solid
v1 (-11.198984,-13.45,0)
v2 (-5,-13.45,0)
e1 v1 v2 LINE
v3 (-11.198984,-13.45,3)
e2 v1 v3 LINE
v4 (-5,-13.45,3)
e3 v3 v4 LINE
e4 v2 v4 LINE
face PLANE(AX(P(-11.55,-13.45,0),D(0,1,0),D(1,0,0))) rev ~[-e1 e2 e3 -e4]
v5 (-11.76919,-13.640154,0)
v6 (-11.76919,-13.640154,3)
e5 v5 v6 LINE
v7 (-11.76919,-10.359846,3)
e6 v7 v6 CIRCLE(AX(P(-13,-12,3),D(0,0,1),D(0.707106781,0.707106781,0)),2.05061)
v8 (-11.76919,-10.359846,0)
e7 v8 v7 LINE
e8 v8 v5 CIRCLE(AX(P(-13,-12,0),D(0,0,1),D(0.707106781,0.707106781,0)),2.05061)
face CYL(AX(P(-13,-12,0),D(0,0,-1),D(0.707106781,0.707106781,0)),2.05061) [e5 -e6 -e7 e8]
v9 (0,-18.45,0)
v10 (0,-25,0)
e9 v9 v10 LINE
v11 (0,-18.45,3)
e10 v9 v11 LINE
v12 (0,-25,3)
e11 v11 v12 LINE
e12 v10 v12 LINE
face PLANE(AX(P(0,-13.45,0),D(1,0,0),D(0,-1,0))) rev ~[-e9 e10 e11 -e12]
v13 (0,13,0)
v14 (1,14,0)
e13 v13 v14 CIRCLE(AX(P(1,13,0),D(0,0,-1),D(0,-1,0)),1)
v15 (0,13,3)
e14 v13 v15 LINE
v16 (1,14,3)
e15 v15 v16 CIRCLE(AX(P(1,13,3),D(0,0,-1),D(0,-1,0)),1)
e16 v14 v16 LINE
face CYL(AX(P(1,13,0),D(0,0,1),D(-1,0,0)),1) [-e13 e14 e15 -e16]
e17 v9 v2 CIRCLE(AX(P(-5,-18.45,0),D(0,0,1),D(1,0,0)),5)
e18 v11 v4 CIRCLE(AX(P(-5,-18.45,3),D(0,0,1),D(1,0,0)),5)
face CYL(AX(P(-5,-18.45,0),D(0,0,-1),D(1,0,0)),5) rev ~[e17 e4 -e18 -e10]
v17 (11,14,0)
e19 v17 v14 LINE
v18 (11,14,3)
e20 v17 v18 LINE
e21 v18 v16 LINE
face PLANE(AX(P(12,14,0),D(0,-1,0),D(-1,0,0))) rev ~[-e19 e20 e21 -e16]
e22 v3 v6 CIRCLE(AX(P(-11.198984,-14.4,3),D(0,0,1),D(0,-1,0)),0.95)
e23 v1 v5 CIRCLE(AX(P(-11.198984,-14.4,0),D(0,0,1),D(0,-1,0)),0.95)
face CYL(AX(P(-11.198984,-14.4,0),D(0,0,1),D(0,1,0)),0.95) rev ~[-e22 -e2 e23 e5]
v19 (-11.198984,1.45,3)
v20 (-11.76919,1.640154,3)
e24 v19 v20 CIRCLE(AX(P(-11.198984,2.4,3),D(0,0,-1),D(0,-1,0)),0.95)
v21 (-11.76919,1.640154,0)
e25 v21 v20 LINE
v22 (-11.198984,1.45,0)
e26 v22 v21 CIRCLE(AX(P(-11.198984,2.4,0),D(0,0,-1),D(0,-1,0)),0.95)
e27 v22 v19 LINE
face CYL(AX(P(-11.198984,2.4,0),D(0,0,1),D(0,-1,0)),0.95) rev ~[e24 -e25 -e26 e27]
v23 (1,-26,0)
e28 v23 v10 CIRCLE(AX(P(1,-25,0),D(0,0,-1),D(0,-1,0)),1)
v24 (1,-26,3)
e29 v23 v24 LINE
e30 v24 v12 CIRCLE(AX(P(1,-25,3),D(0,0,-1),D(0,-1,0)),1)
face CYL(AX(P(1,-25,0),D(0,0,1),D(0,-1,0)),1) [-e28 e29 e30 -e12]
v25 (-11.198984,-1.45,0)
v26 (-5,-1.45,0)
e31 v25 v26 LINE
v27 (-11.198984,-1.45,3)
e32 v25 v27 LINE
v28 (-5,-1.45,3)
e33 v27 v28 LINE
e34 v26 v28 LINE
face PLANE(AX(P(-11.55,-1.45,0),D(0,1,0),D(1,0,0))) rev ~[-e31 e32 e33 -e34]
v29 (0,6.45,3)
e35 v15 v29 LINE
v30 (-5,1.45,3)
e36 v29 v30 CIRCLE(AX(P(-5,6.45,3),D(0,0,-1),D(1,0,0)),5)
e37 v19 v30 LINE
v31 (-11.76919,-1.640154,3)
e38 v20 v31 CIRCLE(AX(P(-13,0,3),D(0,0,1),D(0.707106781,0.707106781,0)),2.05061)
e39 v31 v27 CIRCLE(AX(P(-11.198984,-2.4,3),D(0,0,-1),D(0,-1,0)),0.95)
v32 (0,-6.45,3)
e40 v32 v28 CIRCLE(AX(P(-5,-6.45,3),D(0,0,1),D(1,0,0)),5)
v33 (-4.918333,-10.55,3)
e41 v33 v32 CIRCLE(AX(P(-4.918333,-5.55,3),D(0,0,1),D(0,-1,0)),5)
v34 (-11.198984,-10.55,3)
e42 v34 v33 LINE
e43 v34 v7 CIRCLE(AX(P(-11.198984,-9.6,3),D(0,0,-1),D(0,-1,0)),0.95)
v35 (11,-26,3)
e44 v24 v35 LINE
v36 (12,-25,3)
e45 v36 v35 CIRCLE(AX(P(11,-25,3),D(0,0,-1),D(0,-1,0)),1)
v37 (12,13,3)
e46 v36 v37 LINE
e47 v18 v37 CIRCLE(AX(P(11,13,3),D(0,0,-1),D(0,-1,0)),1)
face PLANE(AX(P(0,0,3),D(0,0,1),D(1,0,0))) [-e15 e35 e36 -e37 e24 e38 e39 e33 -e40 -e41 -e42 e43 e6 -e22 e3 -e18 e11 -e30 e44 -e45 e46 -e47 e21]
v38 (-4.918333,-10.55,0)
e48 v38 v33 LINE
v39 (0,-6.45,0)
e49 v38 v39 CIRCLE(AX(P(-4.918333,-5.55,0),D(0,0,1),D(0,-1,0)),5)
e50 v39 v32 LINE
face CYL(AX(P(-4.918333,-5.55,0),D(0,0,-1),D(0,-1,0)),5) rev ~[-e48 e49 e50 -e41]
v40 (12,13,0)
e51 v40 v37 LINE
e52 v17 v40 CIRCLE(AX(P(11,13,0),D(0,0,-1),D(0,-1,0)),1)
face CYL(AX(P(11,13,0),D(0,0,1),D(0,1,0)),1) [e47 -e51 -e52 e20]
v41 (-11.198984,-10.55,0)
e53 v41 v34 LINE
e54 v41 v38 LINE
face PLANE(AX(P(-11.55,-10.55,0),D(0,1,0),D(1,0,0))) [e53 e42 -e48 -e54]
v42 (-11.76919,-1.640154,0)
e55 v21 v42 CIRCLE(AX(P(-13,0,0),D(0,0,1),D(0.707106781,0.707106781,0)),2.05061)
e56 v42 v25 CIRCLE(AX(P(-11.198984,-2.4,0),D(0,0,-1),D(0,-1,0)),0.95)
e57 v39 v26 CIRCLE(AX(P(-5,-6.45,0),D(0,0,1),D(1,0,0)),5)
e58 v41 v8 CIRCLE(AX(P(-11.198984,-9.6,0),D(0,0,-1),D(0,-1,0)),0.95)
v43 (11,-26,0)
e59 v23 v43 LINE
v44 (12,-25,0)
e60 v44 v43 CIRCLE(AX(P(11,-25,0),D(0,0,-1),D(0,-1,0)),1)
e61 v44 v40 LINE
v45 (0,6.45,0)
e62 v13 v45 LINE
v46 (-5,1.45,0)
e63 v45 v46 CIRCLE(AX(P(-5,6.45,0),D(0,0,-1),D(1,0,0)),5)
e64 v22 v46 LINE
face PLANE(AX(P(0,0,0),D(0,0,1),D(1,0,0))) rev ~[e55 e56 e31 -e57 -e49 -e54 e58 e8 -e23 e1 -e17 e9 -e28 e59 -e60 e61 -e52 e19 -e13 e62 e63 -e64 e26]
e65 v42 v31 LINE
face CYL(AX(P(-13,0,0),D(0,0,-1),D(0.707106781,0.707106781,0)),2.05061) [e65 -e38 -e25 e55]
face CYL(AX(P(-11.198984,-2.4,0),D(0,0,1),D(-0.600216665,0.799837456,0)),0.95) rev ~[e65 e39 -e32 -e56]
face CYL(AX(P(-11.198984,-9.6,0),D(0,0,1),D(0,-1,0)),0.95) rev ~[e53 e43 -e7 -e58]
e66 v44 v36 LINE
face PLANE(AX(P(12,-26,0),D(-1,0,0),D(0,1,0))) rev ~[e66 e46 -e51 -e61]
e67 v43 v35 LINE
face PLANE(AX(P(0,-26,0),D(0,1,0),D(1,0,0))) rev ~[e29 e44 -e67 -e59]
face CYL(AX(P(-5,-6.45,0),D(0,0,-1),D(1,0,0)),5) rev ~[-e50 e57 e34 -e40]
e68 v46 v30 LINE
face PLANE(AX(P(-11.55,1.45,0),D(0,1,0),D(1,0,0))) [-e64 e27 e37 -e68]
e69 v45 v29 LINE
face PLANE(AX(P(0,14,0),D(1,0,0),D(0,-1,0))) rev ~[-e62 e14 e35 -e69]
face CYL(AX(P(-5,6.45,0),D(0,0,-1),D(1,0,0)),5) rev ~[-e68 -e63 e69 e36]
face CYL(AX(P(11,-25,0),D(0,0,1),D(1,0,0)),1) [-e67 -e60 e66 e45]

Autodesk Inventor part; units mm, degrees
ref_plane "Plan YZ" through (0, 0, 0) normal (1, 0, 0) x (0, 1, 0)
ref_plane "Plan XZ" through (0, 0, 0) normal (0, 1, 0) x (-1, 0, 0)
ref_plane "Plan XY" through (0, 0, 0) normal (0, 0, 1) x (1, 0, 0)
sketch "Esquisse1" plane through (0, 0, 0) normal (0, 0, 1) x (1, 0, 0)
  arc A0 (-11.55, 1.45) -> (-11.55, -1.45) centre (-13, 0) ccw
  line L0 (-13, 0) -> (-11.55, -1.45) construction
  line L1 (-13, 0) -> (-10.9494, 0) construction
  line L2 (-13, 0) -> (-11.55, 1.45) construction
  line L3 (-11.55, 1.45) -> (0, 1.45)
  line L4 (-11.55, -1.45) -> (0, -1.45)
  line L5 (0, -34) -> (0, 22) construction
  line L6 (-20.4607, 0) -> (17.4101, 0) construction
  line L7 (-5, -6) -> (5, -6) construction
  arc A1 (-11.55, -10.55) -> (-11.55, -13.45) centre (-13, -12) ccw
  line L8 (-11.55, -13.45) -> (0, -13.45)
  line L9 (-11.55, -10.55) -> (0, -10.55)
  line L10 (0, -26) -> (12, -26)
  line L11 (12, -26) -> (12, 14)
  line L12 (12, 14) -> (0, 14)
  line L13 (0, 14) -> (0, -26)
  line L14 (0, -26) -> (12, 14) construction
  line L15 (12, -26) -> (0, 14) construction
  point P0 (0, 0)
  point P1 (0, -6)
  point P2 (6, -6)
  point P3 (0, -13.45)
  dimension "d0" = 45
  dimension "d1" = 90
  dimension "d3" = 13
  dimension "d7" = 2.9
  dimension "d8" = 10
  dimension "d9" = 6
  dimension "d10" = 12
  dimension "d11" = 40
extrude "Extrusion2" add sketch "Esquisse1" along normal blind 3
fillet "Congé2" radius 0.95 4 edges at (-11.55, -13.45, 1.5) (-11.55, -10.55, 1.5) (-11.55, -1.45, 1.5) (-11.55, 1.45, 1.5)
fillet "Congé3" radius 1 4 edges at (0, -26, 1.5) (12, -26, 1.5) (0, 14, 1.5) (12, 14, 1.5)
fillet "Congé4" radius 5 4 edges at (0, -13.45, 1.5) (0, -1.45, 1.5) (0, -10.55, 1.5) (0, 1.45, 1.5)
properties part number "T2601_Conn" material "."
